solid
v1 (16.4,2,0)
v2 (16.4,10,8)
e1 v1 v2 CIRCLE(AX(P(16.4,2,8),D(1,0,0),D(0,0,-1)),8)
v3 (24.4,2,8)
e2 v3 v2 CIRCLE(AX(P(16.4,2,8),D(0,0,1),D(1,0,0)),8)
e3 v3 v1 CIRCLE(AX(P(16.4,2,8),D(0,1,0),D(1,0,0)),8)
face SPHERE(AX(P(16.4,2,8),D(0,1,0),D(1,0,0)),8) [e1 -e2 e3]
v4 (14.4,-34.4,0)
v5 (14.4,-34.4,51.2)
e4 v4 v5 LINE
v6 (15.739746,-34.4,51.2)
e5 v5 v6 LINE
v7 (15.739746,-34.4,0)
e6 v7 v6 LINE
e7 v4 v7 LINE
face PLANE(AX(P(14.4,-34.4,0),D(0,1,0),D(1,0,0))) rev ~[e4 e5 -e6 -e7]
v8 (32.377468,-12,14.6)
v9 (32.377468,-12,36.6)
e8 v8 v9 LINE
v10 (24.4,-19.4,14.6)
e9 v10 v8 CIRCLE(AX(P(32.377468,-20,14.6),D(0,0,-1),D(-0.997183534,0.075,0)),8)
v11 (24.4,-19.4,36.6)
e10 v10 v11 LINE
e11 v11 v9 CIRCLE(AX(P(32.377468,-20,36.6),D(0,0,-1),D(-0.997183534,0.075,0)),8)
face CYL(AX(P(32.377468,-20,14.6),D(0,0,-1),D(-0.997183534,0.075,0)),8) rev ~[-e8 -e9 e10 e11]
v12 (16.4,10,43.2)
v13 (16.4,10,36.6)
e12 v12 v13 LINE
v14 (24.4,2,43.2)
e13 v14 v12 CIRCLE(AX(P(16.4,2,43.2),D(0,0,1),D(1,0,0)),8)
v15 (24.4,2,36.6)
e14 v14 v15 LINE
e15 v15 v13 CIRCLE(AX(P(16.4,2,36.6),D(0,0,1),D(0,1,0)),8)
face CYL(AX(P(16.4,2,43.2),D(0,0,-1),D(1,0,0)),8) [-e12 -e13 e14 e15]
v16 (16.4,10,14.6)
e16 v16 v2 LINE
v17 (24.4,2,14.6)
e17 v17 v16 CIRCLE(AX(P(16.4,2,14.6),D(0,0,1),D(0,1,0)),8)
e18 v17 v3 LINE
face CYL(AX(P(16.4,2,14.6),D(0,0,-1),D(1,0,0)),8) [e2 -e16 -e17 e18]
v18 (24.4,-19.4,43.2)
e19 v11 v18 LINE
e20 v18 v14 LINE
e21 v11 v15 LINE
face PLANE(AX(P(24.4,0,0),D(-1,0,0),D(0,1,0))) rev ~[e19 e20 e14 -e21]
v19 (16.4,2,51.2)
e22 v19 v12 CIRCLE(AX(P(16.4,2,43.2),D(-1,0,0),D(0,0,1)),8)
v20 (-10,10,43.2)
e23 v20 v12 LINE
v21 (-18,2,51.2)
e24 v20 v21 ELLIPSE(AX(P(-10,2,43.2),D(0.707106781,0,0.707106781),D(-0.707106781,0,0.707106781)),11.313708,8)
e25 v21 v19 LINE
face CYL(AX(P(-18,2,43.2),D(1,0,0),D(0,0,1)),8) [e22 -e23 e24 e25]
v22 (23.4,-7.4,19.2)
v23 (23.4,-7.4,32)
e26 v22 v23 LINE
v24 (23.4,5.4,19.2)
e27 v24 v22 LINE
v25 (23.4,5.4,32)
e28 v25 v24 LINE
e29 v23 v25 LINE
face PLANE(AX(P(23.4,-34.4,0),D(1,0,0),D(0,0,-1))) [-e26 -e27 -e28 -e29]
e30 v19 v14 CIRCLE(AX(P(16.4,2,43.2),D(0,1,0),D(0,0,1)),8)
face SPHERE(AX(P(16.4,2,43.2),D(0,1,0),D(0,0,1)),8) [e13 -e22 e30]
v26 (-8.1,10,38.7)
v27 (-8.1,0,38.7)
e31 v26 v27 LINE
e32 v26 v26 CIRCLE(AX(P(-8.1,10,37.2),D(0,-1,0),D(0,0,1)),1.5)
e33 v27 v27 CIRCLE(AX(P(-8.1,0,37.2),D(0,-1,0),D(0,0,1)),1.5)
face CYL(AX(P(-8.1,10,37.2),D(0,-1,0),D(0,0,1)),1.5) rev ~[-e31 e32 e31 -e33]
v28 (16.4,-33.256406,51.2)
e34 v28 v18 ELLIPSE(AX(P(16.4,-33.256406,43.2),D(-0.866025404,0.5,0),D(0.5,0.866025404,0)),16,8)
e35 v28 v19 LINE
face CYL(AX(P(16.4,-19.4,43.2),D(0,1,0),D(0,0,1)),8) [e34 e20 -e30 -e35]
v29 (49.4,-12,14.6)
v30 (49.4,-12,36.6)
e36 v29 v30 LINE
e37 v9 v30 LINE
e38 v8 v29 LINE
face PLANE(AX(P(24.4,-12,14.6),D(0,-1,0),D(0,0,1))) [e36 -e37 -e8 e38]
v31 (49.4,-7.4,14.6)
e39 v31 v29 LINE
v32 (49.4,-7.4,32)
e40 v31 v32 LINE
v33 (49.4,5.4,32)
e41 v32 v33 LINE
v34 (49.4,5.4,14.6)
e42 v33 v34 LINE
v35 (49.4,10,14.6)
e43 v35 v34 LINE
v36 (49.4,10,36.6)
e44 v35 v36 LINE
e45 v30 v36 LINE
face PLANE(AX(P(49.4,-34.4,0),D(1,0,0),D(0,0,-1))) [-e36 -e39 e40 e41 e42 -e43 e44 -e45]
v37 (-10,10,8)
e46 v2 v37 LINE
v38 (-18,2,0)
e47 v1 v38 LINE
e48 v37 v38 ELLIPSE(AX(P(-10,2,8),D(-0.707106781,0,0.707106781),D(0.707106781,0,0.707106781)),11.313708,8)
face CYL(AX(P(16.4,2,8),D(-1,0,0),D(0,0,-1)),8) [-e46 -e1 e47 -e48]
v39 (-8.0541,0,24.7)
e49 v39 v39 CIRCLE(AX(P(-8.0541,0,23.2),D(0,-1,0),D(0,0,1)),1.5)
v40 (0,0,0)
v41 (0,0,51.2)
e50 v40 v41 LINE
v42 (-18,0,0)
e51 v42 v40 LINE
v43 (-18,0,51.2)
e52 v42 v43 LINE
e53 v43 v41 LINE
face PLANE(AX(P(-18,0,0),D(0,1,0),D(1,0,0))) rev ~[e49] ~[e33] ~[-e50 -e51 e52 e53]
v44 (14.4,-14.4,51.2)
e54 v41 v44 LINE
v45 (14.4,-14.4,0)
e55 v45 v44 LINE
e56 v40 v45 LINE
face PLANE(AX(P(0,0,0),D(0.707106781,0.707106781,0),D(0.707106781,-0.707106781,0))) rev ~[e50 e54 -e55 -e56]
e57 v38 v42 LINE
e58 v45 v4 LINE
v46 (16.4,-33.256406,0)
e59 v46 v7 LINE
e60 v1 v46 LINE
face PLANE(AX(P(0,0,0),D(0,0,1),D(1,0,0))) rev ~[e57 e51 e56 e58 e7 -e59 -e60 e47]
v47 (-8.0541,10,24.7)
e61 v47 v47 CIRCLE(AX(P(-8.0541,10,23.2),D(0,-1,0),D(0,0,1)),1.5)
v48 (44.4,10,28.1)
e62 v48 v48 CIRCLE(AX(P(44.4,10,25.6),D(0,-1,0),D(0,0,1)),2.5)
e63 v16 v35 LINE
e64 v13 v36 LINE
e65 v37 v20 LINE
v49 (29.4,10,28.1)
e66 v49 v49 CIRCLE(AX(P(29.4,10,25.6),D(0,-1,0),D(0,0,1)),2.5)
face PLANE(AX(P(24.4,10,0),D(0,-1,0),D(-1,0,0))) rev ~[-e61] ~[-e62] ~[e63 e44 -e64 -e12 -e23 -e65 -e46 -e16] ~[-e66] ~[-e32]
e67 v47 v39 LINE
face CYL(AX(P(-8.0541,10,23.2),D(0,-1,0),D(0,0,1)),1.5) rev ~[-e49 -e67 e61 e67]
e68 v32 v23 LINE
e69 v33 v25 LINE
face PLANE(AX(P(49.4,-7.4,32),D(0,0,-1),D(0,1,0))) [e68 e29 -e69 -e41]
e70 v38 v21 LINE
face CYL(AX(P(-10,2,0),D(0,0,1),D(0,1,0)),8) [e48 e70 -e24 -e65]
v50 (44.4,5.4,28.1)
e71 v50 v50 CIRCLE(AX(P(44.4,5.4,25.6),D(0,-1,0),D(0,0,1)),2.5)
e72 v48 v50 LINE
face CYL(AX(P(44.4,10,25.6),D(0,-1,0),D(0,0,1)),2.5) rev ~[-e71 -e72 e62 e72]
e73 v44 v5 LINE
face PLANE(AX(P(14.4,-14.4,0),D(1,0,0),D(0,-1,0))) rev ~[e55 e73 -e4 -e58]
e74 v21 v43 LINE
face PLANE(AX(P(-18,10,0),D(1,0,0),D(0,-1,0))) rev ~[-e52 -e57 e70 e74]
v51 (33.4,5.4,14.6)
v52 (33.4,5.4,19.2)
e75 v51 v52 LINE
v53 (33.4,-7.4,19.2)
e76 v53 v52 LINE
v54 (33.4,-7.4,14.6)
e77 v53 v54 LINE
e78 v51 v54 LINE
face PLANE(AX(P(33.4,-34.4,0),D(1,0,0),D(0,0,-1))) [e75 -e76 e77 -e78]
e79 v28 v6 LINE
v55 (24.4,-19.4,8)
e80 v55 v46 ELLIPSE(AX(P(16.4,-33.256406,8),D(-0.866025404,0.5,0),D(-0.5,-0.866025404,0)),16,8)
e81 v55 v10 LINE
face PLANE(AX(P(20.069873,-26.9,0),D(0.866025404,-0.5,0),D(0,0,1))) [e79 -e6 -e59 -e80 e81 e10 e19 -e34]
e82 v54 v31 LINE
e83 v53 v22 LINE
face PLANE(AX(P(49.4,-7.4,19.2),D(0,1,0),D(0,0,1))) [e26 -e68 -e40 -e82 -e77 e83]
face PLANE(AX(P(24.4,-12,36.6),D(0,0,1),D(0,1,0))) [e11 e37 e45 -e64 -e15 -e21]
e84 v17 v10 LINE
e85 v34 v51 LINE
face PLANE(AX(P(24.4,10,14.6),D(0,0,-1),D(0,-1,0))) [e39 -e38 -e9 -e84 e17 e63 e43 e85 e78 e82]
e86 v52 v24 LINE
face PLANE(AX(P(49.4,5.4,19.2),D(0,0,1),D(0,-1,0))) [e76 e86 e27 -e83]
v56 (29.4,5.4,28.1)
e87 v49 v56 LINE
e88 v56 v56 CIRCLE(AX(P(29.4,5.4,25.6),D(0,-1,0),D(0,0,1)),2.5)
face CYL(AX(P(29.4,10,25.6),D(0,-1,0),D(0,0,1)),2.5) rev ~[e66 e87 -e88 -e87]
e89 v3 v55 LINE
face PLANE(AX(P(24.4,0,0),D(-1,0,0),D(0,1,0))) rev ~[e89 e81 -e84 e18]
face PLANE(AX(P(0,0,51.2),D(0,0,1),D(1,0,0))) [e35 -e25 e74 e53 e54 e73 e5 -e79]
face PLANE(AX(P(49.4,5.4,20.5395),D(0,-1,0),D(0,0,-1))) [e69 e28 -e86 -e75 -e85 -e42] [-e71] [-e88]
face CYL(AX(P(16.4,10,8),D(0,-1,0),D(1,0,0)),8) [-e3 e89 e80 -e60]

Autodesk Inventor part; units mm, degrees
ref_plane "YZ Plane" through (0, 0, 0) normal (1, 0, 0) x (0, 1, 0)
ref_plane "XZ Plane" through (0, 0, 0) normal (0, 1, 0) x (-1, 0, 0)
ref_plane "XY Plane" through (0, 0, 0) normal (0, 0, 1) x (1, 0, 0)
sketch "Szkic1" plane through (0, 0, 0) normal (0, 0, 1) x (1, 0, 0)
  point P0 (0, 0)
sketch "Szkic2" plane through (0, 0, 0) normal (0, 0, 1) x (1, 0, 0)
  line L0 (-18, 0) -> (0, 0)
  line L1 (0, 0) -> (14.4, -14.4)
  line L2 (14.4, -14.4) -> (14.4, -34.4)
  line L3 (14.4, -34.4) -> (24.4, -34.4)
  line L4 (24.4, -34.4) -> (24.4, 0)
  line L5 (24.4, 0) -> (24.4, 10)
  line L6 (24.4, 10) -> (-18, 10)
  line L7 (-18, 10) -> (-18, 0)
  dimension "d0" = 14.4
  dimension "d1" = 14.4
  dimension "d2" = 18
  dimension "d3" = 20
  dimension "d4" = 10
  dimension "d5" = 10
extrude "Wyciągnięcie proste1" add sketch "Szkic2" along normal blind 51.2
sketch "Szkic3" plane through (24.4, -34.4, 0) normal (1, 0, 0) x (0, 0, -1)
  line L0 (0, 44.4) -> (0, 0) projected
  line L1 (0, 44.4) -> (-51.2, 44.4) projected
  line L2 (-51.2, 0) -> (-51.2, 44.4) projected
  line L3 (0, 0) -> (-51.2, 0) projected
  line L4 (-36.6, 44.4) -> (-14.6, 44.4)
  line L5 (-14.6, 44.4) -> (-14.6, 22.4)
  line L6 (-14.6, 22.4) -> (-36.6, 22.4)
  line L7 (-36.6, 22.4) -> (-36.6, 44.4)
  point P0 (0, 34.4)
  point P1 (-25.6, 44.4)
  dimension "d8" = 22
  dimension "d9" = 22
extrude "Wyciągnięcie proste2" add sketch "Szkic3" along normal blind 25 contours L5 L6 L7 L1
sketch "Szkic4" plane through (49.4, -34.4, 0) normal (1, 0, 0) x (0, 0, -1)
  line L0 (-14.6, 44.4) -> (-36.6, 44.4) projected
  line L1 (-36.6, 44.4) -> (-36.6, 22.4) projected
  line L2 (-36.6, 22.4) -> (-14.6, 22.4) projected
  line L3 (-14.6, 22.4) -> (-14.6, 44.4) projected
  line L4 (-32, 39.8) -> (-19.2, 39.8)
  line L5 (-19.2, 39.8) -> (-19.2, 27)
  line L6 (-19.2, 27) -> (-32, 27)
  line L7 (-32, 27) -> (-32, 39.8)
  point P0 (0, 34.4)
  point P1 (-25.6, 39.8)
  point P2 (-25.6, 44.4)
  point P3 (-19.2, 33.4)
  point P4 (-14.6, 33.4)
  dimension "d12" = 12.8
  dimension "d13" = 12.8
extrude "Wyciągnięcie proste3" cut sketch "Szkic4" against normal blind 26 contours L4 L5 L6 L7
sketch "Szkic5" plane through (-18, 10, 0) normal (0, 1, 0) x (1, 0, 0)
  line L0 (0, 0) -> (42.4, 0) projected
  line L1 (0, 0) -> (0, -51.2) projected
  line L2 (42.4, -51.2) -> (0, -51.2) projected
  line L3 (42.4, -36.6) -> (42.4, -51.2) projected
  line L4 (42.4, -36.6) -> (67.4, -36.6) projected
  line L5 (67.4, -14.6) -> (67.4, -36.6) projected
  line L6 (42.4, -14.6) -> (67.4, -14.6) projected
  line L7 (42.4, 0) -> (42.4, -14.6) projected
  line L8 (18, 0) -> (18, -51.2) projected
  point P0 (9.9, -37.2)
  point P1 (9.9459, -23.2)
  dimension "d17" = 8.1
  dimension "d18" = 14
  dimension "d19" = 14
hole "Otwór1" at (-8.1, 10, 37.2) at (-8.0541, 10, 23.2) direction (0, -1, 0) diameter 3 end through all
chamfer "Faza1" distance 15 angle 30 1 edges at (24.4, -34.4, 25.6) measured on face at (24.4, -26.9333, 21.9333)
fillet "Zaokrąglenie1" radius 8 1 edges at (24.4, -12, 25.6)
fillet "Zaokrąglenie2" radius 8 1 edges at (24.4, -4.7, 51.2)
fillet "Zaokrąglenie3" radius 8 1 edges at (24.4, -4.7, 0)
fillet "Zaokrąglenie4" radius 8 7 edges at (-18, 10, 25.6) (22.0569, 10, 48.8569) (24.4, 10, 39.9) (-0.8, 10, 51.2) (22.0569, 10, 2.3431) (24.4, 10, 11.3) (-0.8, 10, 0)
sketch "Szkic6" plane through (49.4, -34.4, 0) normal (1, 0, 0) x (0, 0, -1)
  line L0 (-32, 27) -> (-32, 39.8) projected
  line L1 (-32, 39.8) -> (-19.2, 39.8) projected
  line L2 (-19.2, 39.8) -> (-19.2, 27) projected
  line L3 (-19.2, 27) -> (-32, 27) projected
  line L4 (-14.6, 44.4) -> (-36.6, 44.4) projected
  line L5 (-36.6, 44.4) -> (-36.6, 22.4) projected
  line L6 (-36.6, 22.4) -> (-14.6, 22.4) projected
  line L7 (-14.6, 22.4) -> (-14.6, 44.4) projected
  line L8 (-20.5395, 39.8) -> (-13.1078, 39.8)
  line L9 (-13.1078, 39.8) -> (-13.1078, 27)
  line L10 (-13.1078, 27) -> (-20.5395, 27)
  line L11 (-20.5395, 27) -> (-20.5395, 39.8)
  point P0 (0, 34.4)
extrude "Wyciągnięcie proste4" cut sketch "Szkic6" against normal blind 16 contours L11 L1 L2 L3 | L2 L8 L7 L10 | L7 L8 L9 L10
sketch "Szkic7" plane through (49.4, 10, 36.6) normal (0, 1, 0) x (1, 0, 0)
  line L0 (-33, 0) -> (0, 0) projected
  line L1 (0, 22) -> (0, 0) projected
  line L2 (-33, 22) -> (0, 22) projected
  line L3 (-33, 28.6) -> (-33, 22) projected
  line L4 (-59.4, 28.6) -> (-33, 28.6) projected
  line L5 (-59.4, -6.6) -> (-59.4, 28.6) projected
  line L6 (-33, -6.6) -> (-59.4, -6.6) projected
  line L7 (-33, 0) -> (-33, -6.6) projected
  circle A0 centre (-57.5, -0.6) radius 1.5 projected
  circle A1 centre (-57.4541, 13.4) radius 1.5 projected
  point P0 (-49.4, 36.6)
  point P1 (-5, 11)
  point P2 (-20, 11)
  dimension "d36" = 5
  dimension "d37" = 15
hole "Otwór2" at (44.4, 10, 25.6) at (29.4, 10, 25.6) direction (0, -1, 0) diameter 5 depth 8 tip angle 118
properties part number "mocowanie_do_ramy"
